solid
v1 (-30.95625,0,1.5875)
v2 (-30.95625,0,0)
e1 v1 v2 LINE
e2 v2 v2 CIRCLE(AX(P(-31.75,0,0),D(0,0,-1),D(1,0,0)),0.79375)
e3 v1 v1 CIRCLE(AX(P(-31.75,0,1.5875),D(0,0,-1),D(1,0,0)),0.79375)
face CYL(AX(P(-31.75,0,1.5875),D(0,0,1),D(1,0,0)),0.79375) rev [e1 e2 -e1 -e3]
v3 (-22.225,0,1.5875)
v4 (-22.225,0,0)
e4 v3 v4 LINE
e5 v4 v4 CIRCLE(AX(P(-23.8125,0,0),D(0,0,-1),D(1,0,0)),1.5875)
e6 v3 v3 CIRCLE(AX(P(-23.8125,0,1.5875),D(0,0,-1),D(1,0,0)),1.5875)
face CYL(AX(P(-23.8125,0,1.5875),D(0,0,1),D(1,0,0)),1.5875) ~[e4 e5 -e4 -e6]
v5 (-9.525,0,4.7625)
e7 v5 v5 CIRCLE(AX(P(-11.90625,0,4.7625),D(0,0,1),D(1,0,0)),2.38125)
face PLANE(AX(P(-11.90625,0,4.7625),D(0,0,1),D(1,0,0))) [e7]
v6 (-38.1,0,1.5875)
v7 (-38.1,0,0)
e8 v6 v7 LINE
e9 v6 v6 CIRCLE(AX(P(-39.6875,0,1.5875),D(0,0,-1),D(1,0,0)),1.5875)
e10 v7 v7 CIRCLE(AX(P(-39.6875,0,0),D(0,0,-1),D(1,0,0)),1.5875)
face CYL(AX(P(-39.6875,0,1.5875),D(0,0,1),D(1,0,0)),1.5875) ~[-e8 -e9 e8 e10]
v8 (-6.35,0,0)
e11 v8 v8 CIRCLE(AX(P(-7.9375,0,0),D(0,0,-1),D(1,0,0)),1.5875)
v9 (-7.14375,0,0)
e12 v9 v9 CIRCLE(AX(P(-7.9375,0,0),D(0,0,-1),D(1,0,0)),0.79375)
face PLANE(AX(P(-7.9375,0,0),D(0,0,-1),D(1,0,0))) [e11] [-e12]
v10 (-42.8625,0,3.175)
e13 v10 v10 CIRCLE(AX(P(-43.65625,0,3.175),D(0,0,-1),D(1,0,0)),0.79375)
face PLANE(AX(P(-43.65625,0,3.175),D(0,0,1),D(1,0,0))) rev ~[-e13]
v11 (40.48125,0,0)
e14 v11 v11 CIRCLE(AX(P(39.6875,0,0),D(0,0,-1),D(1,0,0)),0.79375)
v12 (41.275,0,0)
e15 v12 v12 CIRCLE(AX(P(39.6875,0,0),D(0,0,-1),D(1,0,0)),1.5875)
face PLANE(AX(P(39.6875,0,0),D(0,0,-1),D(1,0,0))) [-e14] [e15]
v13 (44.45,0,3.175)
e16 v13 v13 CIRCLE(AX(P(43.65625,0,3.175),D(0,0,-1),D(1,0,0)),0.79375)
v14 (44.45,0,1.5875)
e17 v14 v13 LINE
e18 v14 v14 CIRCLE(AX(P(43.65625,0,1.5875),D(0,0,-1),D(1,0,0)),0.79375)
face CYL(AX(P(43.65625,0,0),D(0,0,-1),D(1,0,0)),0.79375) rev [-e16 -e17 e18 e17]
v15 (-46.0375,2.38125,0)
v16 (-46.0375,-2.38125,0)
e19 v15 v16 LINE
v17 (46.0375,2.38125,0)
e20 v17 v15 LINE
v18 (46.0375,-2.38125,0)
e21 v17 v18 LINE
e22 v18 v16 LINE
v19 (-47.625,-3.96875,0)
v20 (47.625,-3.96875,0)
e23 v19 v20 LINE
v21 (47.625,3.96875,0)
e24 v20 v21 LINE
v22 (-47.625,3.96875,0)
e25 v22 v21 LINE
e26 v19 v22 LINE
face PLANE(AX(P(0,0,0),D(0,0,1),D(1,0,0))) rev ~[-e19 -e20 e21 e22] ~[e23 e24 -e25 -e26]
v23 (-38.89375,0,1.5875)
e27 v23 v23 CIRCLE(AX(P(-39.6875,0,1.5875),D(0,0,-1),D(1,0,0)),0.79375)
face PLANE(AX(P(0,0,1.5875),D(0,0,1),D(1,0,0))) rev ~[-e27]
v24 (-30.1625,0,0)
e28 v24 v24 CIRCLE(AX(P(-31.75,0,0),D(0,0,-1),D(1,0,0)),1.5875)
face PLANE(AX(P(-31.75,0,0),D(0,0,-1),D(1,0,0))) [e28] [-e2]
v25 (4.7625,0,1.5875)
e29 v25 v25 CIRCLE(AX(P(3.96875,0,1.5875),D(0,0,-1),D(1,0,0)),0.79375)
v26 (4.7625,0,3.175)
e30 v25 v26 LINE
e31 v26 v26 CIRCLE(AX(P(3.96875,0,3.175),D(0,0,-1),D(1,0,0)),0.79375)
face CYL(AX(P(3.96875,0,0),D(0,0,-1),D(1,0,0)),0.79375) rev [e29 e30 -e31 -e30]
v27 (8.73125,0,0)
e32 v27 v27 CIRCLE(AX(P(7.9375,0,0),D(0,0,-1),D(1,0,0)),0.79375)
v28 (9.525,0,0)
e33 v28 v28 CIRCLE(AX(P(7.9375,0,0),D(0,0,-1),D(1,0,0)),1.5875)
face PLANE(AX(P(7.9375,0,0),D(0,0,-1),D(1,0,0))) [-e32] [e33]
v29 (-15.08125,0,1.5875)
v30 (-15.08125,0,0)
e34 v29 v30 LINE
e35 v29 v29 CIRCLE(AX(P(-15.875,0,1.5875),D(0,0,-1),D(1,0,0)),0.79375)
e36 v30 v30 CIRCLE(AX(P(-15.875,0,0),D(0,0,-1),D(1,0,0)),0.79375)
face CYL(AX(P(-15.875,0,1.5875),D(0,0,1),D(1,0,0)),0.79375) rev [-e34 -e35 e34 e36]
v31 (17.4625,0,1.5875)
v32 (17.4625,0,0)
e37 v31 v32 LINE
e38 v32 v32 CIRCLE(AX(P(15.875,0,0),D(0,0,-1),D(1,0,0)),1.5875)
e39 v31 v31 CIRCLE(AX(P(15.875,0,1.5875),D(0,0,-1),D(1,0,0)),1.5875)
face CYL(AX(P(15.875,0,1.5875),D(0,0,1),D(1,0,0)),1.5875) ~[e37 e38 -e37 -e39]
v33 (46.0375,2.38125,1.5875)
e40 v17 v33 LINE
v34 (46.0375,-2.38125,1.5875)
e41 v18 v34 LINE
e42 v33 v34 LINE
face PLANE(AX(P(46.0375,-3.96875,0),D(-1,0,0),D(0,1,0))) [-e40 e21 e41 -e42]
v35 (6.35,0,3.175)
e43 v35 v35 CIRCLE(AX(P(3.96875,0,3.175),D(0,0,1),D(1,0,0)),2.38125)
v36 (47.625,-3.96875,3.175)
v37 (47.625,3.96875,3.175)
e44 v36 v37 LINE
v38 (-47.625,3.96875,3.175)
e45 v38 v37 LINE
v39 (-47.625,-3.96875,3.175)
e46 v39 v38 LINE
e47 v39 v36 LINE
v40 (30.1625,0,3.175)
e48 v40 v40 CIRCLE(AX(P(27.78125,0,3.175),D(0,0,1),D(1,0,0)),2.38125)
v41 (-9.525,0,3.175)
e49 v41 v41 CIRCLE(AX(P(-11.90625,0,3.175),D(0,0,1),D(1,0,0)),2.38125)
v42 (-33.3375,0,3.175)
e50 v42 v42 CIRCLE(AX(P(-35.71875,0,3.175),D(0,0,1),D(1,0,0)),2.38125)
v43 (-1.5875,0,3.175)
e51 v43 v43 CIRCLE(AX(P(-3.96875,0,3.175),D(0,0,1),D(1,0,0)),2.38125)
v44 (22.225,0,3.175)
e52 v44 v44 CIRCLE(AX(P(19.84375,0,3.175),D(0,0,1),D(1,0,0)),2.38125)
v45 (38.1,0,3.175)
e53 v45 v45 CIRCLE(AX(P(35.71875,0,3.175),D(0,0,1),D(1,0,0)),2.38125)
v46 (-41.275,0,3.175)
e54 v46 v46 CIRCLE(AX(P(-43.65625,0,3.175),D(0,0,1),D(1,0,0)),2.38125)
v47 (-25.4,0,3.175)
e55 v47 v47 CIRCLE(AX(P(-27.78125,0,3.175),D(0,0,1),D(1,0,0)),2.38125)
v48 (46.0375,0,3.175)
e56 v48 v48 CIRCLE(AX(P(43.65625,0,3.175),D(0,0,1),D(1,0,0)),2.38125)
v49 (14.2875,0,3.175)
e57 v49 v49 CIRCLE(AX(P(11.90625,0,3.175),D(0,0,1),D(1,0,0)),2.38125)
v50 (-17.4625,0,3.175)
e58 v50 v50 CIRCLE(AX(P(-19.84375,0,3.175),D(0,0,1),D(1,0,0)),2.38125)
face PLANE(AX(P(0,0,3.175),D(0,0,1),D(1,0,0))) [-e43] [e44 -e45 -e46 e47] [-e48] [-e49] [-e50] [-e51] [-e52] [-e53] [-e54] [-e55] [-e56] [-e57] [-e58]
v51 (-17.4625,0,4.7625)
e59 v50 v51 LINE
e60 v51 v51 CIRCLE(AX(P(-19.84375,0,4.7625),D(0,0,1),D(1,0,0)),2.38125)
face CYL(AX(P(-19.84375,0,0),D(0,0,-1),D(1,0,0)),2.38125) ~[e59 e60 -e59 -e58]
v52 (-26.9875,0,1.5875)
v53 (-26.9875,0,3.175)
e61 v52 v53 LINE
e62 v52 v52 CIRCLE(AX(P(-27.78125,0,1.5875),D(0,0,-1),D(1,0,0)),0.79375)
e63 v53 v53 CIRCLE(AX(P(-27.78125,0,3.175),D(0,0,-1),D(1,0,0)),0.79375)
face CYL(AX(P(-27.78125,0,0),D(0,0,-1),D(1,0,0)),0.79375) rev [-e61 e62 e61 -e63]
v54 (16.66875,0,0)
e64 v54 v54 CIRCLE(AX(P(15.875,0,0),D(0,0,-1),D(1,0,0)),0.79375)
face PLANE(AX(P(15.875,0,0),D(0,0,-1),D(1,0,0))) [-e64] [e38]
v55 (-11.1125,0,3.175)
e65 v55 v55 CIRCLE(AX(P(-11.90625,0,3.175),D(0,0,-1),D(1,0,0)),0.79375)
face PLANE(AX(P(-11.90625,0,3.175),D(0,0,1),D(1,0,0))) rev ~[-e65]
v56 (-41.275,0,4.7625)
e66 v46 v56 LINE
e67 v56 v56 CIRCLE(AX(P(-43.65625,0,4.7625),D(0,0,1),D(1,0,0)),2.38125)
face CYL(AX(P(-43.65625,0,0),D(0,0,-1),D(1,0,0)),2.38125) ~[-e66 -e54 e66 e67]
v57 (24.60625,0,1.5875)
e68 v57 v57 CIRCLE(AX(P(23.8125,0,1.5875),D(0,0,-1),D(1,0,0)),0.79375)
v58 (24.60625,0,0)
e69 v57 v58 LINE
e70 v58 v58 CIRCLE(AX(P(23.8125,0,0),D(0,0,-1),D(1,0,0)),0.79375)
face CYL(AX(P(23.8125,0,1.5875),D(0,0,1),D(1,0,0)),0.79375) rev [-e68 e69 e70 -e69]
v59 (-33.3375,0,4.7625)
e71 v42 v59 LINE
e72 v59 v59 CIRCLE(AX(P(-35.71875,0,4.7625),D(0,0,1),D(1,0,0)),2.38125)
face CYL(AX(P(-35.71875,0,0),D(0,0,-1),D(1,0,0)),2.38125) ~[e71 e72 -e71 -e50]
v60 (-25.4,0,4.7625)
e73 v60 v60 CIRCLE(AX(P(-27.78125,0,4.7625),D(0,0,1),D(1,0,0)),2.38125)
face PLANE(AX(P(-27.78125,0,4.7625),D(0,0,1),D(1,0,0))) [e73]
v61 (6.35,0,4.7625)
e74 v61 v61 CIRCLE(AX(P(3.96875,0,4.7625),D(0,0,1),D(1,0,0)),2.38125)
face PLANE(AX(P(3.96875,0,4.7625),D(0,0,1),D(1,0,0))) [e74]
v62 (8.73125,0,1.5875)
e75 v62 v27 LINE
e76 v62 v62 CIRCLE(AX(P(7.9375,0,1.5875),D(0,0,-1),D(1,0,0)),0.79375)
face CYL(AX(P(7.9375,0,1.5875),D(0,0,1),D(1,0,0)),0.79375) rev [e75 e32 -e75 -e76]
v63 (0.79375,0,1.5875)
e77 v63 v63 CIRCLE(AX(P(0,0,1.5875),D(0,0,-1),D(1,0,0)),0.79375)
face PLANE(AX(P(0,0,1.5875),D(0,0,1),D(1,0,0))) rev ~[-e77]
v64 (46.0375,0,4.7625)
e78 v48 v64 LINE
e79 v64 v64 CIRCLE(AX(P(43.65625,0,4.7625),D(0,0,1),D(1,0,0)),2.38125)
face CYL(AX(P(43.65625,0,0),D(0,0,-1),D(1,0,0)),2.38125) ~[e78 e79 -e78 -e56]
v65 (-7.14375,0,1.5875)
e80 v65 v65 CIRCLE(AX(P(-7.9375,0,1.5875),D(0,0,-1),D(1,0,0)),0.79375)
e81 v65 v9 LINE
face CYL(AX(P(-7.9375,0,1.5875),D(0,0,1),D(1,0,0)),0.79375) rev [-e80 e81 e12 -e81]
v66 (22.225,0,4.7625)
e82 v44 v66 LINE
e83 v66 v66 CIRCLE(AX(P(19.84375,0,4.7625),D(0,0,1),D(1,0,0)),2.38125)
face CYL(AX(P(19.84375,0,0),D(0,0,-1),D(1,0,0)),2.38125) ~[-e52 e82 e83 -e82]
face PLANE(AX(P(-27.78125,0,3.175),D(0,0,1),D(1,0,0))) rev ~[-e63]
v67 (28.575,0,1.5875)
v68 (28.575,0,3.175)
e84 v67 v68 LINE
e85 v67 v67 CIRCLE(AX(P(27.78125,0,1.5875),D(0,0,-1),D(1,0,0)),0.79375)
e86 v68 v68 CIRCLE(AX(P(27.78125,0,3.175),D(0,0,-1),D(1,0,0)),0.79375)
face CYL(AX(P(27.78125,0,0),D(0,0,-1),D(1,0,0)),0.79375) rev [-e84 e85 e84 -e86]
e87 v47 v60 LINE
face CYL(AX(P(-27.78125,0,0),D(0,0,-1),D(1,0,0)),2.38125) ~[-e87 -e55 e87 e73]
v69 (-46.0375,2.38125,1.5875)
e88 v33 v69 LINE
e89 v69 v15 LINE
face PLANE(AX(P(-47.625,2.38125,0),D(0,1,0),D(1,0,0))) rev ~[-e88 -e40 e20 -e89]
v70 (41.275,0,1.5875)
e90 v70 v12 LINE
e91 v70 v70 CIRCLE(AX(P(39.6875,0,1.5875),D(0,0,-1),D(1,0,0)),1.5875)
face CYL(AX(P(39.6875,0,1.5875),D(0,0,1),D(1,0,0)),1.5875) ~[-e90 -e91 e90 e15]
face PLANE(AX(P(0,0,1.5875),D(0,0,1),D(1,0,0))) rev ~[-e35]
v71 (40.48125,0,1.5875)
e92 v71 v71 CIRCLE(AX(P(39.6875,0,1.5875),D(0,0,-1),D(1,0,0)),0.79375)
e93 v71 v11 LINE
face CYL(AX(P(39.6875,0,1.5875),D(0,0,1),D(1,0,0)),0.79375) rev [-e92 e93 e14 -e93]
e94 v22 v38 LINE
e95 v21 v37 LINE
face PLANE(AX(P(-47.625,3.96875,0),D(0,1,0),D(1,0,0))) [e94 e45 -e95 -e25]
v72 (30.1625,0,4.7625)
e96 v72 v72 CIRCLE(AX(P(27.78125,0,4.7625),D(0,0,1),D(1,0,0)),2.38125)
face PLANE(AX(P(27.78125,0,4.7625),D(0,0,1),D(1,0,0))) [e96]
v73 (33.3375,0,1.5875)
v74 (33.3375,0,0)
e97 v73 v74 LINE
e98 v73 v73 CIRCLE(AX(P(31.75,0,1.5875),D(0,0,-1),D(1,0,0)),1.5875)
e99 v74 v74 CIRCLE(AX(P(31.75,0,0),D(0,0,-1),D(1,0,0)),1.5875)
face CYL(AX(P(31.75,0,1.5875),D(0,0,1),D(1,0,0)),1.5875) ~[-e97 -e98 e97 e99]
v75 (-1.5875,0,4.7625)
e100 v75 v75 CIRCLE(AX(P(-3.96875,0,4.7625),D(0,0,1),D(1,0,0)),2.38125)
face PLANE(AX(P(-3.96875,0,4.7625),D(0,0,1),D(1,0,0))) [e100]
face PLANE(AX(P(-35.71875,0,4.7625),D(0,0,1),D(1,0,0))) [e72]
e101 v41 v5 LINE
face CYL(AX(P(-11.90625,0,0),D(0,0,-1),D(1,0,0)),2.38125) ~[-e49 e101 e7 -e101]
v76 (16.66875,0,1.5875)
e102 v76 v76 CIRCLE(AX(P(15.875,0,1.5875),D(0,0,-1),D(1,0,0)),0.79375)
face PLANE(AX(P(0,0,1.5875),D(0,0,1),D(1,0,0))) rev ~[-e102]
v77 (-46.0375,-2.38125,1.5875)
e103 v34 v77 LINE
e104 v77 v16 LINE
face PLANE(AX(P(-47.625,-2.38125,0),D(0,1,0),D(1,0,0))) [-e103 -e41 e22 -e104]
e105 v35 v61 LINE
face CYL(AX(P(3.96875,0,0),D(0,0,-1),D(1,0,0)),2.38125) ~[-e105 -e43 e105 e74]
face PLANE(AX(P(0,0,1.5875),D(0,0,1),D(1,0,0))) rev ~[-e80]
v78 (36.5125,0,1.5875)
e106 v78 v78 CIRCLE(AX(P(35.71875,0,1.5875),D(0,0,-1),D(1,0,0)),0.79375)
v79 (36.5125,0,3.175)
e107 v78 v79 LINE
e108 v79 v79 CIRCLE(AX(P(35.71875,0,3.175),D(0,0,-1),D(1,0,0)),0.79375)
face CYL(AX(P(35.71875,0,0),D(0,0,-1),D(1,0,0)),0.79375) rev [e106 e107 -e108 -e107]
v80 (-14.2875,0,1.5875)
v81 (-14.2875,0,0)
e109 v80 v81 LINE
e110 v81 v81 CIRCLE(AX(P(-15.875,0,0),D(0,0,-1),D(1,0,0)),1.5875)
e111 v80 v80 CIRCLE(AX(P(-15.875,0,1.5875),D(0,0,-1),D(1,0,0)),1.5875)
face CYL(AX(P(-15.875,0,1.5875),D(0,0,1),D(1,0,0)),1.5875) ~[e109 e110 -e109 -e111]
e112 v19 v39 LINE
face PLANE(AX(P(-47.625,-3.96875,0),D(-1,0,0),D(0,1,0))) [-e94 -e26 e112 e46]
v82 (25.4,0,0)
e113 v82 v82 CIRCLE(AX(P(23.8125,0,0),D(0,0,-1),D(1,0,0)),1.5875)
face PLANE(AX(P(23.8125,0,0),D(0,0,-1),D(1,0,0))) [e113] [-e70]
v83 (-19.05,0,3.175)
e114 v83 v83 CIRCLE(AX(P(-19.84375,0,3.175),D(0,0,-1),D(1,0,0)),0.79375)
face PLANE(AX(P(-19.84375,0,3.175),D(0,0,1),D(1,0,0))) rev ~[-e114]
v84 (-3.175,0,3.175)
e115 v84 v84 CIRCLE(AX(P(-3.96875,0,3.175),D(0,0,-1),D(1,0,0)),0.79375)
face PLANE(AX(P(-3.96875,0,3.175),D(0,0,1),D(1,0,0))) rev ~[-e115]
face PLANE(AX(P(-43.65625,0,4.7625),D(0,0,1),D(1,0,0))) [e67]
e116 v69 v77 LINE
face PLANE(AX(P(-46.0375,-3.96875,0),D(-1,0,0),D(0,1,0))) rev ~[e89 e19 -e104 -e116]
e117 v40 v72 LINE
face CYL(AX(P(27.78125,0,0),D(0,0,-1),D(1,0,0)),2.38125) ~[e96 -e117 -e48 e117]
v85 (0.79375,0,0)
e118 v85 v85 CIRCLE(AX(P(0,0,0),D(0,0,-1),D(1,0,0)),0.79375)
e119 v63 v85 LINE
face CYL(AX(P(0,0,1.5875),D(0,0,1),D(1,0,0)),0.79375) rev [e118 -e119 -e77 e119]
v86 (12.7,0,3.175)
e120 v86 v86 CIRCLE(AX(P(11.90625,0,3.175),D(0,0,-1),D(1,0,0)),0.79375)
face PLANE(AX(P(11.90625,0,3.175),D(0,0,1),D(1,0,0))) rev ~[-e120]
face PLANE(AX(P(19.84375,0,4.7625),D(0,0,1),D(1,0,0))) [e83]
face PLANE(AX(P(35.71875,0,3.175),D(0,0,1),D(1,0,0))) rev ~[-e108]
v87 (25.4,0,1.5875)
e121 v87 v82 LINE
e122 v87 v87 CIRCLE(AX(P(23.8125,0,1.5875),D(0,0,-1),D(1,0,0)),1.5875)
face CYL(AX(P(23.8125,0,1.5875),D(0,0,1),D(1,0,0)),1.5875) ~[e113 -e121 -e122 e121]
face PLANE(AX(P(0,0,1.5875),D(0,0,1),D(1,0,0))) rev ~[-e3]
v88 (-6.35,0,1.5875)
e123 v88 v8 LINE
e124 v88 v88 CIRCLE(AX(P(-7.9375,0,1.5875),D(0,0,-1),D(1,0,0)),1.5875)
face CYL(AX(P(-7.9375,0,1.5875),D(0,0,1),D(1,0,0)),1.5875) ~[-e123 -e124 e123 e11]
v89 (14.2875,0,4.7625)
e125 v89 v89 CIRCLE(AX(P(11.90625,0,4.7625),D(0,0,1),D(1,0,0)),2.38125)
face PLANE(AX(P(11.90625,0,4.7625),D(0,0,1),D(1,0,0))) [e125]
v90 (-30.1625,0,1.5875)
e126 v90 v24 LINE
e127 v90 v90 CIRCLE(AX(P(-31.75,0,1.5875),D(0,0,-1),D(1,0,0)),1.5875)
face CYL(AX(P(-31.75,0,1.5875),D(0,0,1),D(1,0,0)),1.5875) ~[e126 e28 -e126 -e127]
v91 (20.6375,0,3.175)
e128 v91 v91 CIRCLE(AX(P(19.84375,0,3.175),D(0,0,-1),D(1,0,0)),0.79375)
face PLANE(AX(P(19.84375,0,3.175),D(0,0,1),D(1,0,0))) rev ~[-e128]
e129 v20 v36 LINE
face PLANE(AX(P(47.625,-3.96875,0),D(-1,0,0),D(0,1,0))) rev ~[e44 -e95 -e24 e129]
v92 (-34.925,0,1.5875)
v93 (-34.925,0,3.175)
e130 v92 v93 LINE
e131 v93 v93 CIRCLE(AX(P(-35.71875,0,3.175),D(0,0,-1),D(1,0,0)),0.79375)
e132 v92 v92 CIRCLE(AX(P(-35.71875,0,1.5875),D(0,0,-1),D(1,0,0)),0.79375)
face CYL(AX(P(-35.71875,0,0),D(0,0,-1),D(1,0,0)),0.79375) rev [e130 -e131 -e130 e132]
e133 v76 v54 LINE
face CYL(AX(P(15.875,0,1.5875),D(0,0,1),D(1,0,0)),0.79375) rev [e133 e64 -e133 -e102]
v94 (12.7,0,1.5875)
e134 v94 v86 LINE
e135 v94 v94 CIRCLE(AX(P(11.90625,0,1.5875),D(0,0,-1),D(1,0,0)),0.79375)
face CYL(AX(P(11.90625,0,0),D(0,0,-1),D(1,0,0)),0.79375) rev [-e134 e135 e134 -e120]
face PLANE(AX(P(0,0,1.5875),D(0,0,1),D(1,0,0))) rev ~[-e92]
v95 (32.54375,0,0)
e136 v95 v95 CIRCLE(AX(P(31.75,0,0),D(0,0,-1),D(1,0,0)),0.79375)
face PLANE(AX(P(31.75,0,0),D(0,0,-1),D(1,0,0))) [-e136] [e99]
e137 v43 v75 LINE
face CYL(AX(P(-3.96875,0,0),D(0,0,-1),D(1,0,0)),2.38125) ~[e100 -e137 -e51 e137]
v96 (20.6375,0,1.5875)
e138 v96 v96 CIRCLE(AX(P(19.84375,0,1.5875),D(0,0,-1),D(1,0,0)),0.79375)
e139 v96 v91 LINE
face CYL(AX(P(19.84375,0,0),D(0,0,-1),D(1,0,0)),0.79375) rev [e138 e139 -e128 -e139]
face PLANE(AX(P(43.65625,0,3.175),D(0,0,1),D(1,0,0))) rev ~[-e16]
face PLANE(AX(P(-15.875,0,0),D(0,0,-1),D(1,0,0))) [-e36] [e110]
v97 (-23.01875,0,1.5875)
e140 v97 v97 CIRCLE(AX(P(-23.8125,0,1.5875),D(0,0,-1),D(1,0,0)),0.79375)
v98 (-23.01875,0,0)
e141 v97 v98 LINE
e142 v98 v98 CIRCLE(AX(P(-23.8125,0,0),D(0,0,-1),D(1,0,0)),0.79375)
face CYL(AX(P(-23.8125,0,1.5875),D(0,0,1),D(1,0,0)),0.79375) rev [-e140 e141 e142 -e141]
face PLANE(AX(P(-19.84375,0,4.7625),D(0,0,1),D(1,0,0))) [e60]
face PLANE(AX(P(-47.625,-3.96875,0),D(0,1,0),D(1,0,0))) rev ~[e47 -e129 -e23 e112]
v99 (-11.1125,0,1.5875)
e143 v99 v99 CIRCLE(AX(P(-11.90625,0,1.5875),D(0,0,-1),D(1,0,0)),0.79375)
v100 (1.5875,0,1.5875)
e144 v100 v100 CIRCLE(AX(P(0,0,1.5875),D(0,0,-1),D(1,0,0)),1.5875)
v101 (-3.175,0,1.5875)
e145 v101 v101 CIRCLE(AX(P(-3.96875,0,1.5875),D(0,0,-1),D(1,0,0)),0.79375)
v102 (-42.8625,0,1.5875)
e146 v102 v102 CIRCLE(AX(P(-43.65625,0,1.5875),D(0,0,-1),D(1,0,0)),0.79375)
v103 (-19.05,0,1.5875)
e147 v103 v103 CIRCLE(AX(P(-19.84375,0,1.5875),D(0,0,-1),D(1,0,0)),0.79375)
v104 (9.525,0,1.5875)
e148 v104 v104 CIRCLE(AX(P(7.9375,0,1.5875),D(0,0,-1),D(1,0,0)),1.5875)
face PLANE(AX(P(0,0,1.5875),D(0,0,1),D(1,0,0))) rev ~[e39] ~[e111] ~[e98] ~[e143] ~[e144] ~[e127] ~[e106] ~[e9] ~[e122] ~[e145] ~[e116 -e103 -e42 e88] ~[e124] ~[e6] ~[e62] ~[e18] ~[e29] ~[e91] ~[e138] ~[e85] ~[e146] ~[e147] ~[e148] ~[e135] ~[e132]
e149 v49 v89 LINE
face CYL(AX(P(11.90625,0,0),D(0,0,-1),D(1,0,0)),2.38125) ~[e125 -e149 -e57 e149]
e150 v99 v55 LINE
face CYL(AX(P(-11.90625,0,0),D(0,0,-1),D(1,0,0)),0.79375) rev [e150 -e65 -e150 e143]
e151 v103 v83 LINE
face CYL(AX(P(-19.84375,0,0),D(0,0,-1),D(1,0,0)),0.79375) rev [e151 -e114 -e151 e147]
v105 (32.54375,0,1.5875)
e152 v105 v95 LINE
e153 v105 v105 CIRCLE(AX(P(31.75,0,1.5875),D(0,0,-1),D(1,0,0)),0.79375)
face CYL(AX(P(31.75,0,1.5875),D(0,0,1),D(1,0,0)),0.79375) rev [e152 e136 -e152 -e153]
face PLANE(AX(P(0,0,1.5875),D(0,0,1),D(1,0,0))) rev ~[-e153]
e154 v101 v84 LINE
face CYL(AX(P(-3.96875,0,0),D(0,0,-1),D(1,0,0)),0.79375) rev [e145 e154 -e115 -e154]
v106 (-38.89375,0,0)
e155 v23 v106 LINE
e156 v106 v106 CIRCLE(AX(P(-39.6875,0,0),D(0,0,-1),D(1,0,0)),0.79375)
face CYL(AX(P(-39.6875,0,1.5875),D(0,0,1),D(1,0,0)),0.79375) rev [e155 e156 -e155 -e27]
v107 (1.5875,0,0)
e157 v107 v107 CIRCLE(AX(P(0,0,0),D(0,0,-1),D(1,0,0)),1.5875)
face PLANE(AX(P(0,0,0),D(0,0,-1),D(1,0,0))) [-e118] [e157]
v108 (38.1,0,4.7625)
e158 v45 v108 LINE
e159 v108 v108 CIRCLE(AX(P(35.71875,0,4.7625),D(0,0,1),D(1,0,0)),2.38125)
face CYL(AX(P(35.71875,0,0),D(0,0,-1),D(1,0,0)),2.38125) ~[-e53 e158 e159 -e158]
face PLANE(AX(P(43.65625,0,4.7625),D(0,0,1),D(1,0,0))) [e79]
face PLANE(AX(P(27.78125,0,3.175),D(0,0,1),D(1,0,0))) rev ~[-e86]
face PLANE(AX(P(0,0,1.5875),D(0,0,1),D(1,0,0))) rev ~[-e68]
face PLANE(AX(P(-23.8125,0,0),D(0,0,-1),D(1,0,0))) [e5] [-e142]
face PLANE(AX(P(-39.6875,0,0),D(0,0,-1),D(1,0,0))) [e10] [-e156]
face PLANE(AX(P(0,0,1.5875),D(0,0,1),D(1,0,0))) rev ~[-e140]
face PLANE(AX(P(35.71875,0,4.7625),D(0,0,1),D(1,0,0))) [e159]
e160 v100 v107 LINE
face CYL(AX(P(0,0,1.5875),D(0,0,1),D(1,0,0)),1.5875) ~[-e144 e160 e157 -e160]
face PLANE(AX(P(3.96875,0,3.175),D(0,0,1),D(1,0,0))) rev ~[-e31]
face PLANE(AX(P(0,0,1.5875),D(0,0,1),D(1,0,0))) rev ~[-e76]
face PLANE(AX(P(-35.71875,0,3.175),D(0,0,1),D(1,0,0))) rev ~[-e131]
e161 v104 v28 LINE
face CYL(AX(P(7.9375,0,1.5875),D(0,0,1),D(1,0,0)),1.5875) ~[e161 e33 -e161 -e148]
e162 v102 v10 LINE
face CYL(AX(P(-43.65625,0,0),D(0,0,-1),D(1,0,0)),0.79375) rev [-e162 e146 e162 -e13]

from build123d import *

# Parameters (mm, degrees)
F0_W     = 95.25
F0_H     = 7.9375
F0_R     = 2.38125
F1_DEPTH = 3.175
F2_DEPTH = 4.7625
F3_T     = -1.5875
F4_R     = 1.5875
F4_R_2   = 0.79375
F5_DEPTH = 1.5875


# Not quite as in the source:
# - a feature names something its author has since deleted; it is built from what else it names


with BuildPart() as f1:
    # F0 (on Top) → F1 (new body)
    with BuildSketch(Plane.XY):
        Rectangle(F0_W, F0_H)
        with Locations((-43.65625, 0)):
            Circle(F0_R, mode=Mode.SUBTRACT)
        with Locations((-35.71875, 0)):
            Circle(F0_R, mode=Mode.SUBTRACT)
        with Locations((-27.78125, 0)):
            Circle(F0_R, mode=Mode.SUBTRACT)
        with Locations((-19.84375, 0)):
            Circle(F0_R, mode=Mode.SUBTRACT)
        with Locations((-11.90625, 0)):
            Circle(F0_R, mode=Mode.SUBTRACT)
        with Locations((-3.96875, 0)):
            Circle(F0_R, mode=Mode.SUBTRACT)
        with Locations((3.96875, 0)):
            Circle(F0_R, mode=Mode.SUBTRACT)
        with Locations((11.90625, 0)):
            Circle(F0_R, mode=Mode.SUBTRACT)
        with Locations((19.84375, 0)):
            Circle(F0_R, mode=Mode.SUBTRACT)
        with Locations((27.78125, 0)):
            Circle(F0_R, mode=Mode.SUBTRACT)
        with Locations((35.71875, 0)):
            Circle(F0_R, mode=Mode.SUBTRACT)
        with Locations((43.65625, 0)):
            Circle(F0_R, mode=Mode.SUBTRACT)
    extrude(amount=F1_DEPTH)

    # F0 (on Top) → F2 (join)
    with BuildSketch(Plane.XY):
        with Locations((-43.65625, 0)):
            Circle(F0_R)
        with Locations((-27.78125, 0)):
            Circle(F0_R)
        with Locations((-35.71875, 0)):
            Circle(F0_R)
        with Locations((-19.84375, 0)):
            Circle(F0_R)
        with Locations((-11.90625, 0)):
            Circle(F0_R)
        with Locations((-3.96875, 0)):
            Circle(F0_R)
        with Locations((3.96875, 0)):
            Circle(F0_R)
        with Locations((11.90625, 0)):
            Circle(F0_R)
        with Locations((19.84375, 0)):
            Circle(F0_R)
        with Locations((27.78125, 0)):
            Circle(F0_R)
        with Locations((35.71875, 0)):
            Circle(F0_R)
        with Locations((43.65625, 0)):
            Circle(F0_R)
    extrude(amount=F2_DEPTH)

    # F3
    f3_openings = [f1.faces().sort_by_distance(p)[0] for p in [
        (0, 0, 0),
    ]]
    offset(amount=F3_T, openings=f3_openings, kind=Kind.INTERSECTION)

    # F4 (on face) → F5 (join)
    with BuildSketch(Plane(origin=(0, 0, 1.5875), x_dir=(1, 0, 0), z_dir=(0, 0, -1))):
        with Locations((-39.6875, 0)):
            Circle(F4_R)
        with Locations((-39.6875, 0)):
            Circle(F4_R_2, mode=Mode.SUBTRACT)
        with Locations((-31.75, 0)):
            Circle(F4_R)
        with Locations((-31.75, 0)):
            Circle(F4_R_2, mode=Mode.SUBTRACT)
        with Locations((-23.8125, 0)):
            Circle(F4_R)
        with Locations((-23.8125, 0)):
            Circle(F4_R_2, mode=Mode.SUBTRACT)
        with Locations((-15.875, 0)):
            Circle(F4_R)
        with Locations((-15.875, 0)):
            Circle(F4_R_2, mode=Mode.SUBTRACT)
        with Locations((-7.9375, 0)):
            Circle(F4_R)
        with Locations((-7.9375, 0)):
            Circle(F4_R_2, mode=Mode.SUBTRACT)
        Circle(F4_R)
        Circle(F4_R_2, mode=Mode.SUBTRACT)
        with Locations((7.9375, 0)):
            Circle(F4_R)
        with Locations((7.9375, 0)):
            Circle(F4_R_2, mode=Mode.SUBTRACT)
        with Locations((15.875, 0)):
            Circle(F4_R)
        with Locations((15.875, 0)):
            Circle(F4_R_2, mode=Mode.SUBTRACT)
        with Locations((23.8125, 0)):
            Circle(F4_R)
        with Locations((23.8125, 0)):
            Circle(F4_R_2, mode=Mode.SUBTRACT)
        with Locations((31.75, 0)):
            Circle(F4_R)
        with Locations((31.75, 0)):
            Circle(F4_R_2, mode=Mode.SUBTRACT)
        with Locations((39.6875, 0)):
            Circle(F4_R)
        with Locations((39.6875, 0)):
            Circle(F4_R_2, mode=Mode.SUBTRACT)
    extrude(amount=F5_DEPTH)


solid = f1.part
